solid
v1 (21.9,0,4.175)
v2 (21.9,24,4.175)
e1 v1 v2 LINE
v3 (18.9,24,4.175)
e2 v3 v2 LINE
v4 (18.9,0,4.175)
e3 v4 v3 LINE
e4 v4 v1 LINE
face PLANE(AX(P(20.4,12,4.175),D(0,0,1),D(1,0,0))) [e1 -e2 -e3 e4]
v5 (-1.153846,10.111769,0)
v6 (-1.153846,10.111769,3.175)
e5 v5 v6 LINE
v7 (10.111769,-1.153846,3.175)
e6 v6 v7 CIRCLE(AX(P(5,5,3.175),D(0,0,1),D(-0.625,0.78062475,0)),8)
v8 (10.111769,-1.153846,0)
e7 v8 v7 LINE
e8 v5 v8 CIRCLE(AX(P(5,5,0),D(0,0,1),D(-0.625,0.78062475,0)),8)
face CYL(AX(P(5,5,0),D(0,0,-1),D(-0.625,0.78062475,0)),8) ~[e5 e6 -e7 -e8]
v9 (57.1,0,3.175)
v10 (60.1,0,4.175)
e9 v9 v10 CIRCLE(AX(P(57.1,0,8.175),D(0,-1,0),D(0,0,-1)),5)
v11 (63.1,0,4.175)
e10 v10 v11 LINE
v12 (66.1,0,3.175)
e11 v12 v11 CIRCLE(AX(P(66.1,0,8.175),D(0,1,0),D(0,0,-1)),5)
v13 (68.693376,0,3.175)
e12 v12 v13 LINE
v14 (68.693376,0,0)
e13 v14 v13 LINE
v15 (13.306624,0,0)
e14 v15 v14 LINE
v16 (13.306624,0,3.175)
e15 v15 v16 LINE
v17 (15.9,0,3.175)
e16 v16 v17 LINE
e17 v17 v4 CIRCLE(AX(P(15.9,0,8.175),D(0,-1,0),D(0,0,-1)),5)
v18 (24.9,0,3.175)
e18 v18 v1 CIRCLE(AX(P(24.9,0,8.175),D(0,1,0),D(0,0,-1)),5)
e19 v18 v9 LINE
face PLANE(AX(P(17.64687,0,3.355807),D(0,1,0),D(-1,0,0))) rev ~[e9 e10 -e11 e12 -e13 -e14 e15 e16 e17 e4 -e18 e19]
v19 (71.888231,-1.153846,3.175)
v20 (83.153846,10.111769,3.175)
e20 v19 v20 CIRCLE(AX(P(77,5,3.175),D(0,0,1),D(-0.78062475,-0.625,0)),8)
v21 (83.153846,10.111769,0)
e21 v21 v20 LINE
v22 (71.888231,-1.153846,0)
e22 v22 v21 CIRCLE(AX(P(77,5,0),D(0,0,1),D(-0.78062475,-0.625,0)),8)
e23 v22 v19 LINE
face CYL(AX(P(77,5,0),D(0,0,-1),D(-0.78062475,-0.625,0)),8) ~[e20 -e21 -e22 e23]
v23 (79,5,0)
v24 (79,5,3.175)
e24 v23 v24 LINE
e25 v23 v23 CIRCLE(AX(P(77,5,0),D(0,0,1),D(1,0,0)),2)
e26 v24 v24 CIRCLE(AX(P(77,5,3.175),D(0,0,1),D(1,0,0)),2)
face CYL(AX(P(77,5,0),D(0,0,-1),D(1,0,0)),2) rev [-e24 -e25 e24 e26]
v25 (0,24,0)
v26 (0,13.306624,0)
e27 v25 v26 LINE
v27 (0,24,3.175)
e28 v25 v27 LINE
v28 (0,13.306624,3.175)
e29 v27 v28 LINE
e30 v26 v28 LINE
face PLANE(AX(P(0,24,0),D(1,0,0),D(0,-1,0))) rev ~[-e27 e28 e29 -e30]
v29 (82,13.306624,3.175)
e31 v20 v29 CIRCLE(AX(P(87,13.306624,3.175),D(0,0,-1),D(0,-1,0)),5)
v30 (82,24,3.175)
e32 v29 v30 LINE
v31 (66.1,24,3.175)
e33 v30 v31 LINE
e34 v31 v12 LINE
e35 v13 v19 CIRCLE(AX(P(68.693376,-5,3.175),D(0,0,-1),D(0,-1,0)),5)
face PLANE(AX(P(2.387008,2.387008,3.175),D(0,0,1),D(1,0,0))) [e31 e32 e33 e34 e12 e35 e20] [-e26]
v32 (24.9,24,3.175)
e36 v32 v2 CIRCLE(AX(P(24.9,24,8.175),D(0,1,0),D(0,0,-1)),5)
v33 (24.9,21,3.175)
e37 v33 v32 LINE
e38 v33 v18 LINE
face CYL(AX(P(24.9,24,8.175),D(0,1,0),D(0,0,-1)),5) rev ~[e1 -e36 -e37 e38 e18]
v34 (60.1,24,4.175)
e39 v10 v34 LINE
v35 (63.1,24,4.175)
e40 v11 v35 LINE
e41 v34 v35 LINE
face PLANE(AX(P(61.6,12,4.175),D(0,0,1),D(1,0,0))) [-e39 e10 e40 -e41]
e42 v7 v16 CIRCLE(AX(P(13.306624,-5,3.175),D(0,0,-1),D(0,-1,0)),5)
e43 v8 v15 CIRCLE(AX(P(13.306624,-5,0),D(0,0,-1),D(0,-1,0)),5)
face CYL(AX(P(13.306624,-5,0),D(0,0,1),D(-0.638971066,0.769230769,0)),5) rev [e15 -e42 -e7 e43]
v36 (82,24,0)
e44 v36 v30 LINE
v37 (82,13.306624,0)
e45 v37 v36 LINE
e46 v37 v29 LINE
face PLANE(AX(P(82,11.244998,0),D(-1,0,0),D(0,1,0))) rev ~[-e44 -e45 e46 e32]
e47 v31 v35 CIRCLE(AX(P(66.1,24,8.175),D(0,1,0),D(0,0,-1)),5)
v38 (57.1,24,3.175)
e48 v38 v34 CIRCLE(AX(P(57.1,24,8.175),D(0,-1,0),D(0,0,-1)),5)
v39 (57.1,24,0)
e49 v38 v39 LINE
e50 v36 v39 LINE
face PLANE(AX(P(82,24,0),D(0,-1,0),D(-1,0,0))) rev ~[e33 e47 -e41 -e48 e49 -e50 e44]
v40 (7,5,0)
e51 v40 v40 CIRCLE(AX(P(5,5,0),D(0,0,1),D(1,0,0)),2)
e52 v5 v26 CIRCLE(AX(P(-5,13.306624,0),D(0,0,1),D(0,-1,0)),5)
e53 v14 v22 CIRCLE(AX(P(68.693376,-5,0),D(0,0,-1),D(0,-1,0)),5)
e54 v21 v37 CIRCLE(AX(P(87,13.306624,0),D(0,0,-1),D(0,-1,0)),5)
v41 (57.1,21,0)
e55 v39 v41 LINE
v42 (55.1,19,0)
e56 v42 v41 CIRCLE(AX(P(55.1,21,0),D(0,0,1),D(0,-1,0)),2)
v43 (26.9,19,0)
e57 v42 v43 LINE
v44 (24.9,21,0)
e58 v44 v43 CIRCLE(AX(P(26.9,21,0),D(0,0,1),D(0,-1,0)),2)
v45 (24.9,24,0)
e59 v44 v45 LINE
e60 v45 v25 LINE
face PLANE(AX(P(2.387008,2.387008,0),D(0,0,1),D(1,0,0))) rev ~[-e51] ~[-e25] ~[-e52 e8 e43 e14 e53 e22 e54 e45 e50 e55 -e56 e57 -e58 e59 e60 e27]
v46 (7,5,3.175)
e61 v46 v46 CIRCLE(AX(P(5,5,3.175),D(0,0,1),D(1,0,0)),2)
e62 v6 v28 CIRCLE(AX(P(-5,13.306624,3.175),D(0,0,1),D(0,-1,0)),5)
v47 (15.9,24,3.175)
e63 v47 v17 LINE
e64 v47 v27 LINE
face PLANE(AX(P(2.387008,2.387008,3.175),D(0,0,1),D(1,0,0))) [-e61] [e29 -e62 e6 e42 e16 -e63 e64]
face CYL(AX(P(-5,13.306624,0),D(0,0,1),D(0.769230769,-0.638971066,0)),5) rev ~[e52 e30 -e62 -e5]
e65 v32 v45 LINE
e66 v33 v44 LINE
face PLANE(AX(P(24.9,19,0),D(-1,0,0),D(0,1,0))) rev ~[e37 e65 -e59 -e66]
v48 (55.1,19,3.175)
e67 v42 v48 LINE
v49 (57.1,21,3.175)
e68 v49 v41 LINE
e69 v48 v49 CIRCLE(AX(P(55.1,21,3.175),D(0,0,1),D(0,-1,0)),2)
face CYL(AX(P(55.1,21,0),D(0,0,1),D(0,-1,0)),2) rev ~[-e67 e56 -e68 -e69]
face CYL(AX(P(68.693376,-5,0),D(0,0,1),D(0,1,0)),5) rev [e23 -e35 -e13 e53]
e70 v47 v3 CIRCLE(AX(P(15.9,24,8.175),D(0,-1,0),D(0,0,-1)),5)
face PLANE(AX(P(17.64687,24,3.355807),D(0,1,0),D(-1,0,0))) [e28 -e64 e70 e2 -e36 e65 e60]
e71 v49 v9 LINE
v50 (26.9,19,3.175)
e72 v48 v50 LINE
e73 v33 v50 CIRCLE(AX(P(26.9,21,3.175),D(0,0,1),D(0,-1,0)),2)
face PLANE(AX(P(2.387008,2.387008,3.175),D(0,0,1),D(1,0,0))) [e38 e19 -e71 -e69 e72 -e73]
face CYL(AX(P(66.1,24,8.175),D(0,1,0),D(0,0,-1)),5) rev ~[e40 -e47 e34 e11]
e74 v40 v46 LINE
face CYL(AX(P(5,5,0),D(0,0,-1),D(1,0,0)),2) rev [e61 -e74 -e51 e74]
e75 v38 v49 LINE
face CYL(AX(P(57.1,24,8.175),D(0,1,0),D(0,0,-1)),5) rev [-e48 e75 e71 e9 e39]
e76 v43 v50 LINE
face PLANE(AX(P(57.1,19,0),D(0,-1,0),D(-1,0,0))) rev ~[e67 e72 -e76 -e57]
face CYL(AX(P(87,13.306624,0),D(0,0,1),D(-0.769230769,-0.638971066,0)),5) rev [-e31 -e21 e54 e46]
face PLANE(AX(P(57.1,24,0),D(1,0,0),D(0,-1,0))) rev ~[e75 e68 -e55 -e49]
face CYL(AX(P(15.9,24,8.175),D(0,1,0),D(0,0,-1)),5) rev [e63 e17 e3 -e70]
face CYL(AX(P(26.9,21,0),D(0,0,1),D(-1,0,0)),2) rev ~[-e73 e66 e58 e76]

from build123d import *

# Parameters (mm, degrees)
F0_R        = 2
F1_DEPTH    = 3.175
F2_R        = 5
F3_R        = 2
F4_W        = 3
F4_H        = 24
F5_DEPTH    = 1
F6_T1_DEPTH = 24


# Not quite as in the source:
# - a fillet or chamfer that OpenCascade refuses, or shapes differently, is made with other operations: its cross-section is extruded or revolved along the edge and cut away or added


with BuildPart() as f1:
    # F0 (on Top) → F1 (new body)
    with BuildSketch(Plane.XY):
        with BuildLine():
            Line((11.2449979984, 0), (0, 0))
            Line((0, 0), (0, 11.2449979984))
            ThreePointArc((0, 11.2449979984), (-0.6568542495, -0.6568542495), (11.2449979984, 0))
        make_face()
        Polygon((0, 11.2449979984), (0, 0), (11.2449979984, 0), (41, 0), (70.7550020016, 0), (82, 0), (82, 11.2449979984), (82, 24), (57.1, 24), (57.1, 19), (41, 19), (24.9, 19), (24.9, 24), (0, 24), align=None)
        with Locations((5, 5)):
            Circle(F0_R, mode=Mode.SUBTRACT)
        with Locations((77, 5)):
            Circle(F0_R, mode=Mode.SUBTRACT)
        with BuildLine():
            Line((82, 0), (70.7550020016, 0))
            ThreePointArc((70.7550020016, 0), (82.6568542495, -0.6568542495), (82, 11.2449979984))
            Line((82, 11.2449979984), (82, 0))
        make_face()
    extrude(amount=F1_DEPTH)

    # F2
    f2_edges = [f1.edges().sort_by_distance(p)[0] for p in [
        (11.244998, 0, 1.5875),
        (70.755002, 0, 1.5875),
        (82, 11.244998, 1.5875),
        (0, 11.244998, 1.5875),
    ]]
    fillet(f2_edges, radius=F2_R)

    # F3
    f3_edges = [f1.edges().sort_by_distance(p)[0] for p in [
        (24.9, 19, 1.5875),
        (57.1, 19, 1.5875),
    ]]
    fillet(f3_edges, radius=F3_R)

    # F4 (on face) → F5 (join)
    with BuildSketch(Plane.XY.offset(3.175)):
        with Locations((20.4, 12)):
            Rectangle(F4_W, F4_H)
        with Locations((61.6, 12)):
            Rectangle(F4_W, F4_H)
    extrude(amount=F5_DEPTH)

    # F6: fillet of radius 5 on 4 edges, made by hand

    # F6_s2 → F6_t1 (join)
    with BuildSketch(Plane.XZ.offset(-24)):
        with BuildLine():
            ThreePointArc((15.9, 3.175), (17.4811388301, 3.4315835097), (18.9, 4.175))
            Line((18.9, 4.175), (18.96, 4.095))
            ThreePointArc((18.96, 4.095), (19, 3.675), (19, 3.175))
            Line((19, 3.175), (18.9, 3.075))
            Line((18.9, 3.075), (15.9, 3.075))
            Line((15.9, 3.075), (15.9, 3.175))
        make_face()
        with BuildLine():
            ThreePointArc((24.9, 3.175), (23.3188611699, 3.4315835097), (21.9, 4.175))
            Line((21.9, 4.175), (21.84, 4.095))
            ThreePointArc((21.84, 4.095), (21.8, 3.675), (21.8, 3.175))
            Line((21.8, 3.175), (21.9, 3.075))
            Line((21.9, 3.075), (24.9, 3.075))
            Line((24.9, 3.075), (24.9, 3.175))
        make_face()
        with BuildLine():
            ThreePointArc((57.1, 3.175), (58.6811388301, 3.4315835097), (60.1, 4.175))
            Line((60.1, 4.175), (60.16, 4.095))
            ThreePointArc((60.16, 4.095), (60.2, 3.675), (60.2, 3.175))
            Line((60.2, 3.175), (60.1, 3.075))
            Line((60.1, 3.075), (57.1, 3.075))
            Line((57.1, 3.075), (57.1, 3.175))
        make_face()
        with BuildLine():
            ThreePointArc((66.1, 3.175), (64.5188611699, 3.4315835097), (63.1, 4.175))
            Line((63.1, 4.175), (63.04, 4.095))
            ThreePointArc((63.04, 4.095), (63, 3.675), (63, 3.175))
            Line((63, 3.175), (63.1, 3.075))
            Line((63.1, 3.075), (66.1, 3.075))
            Line((66.1, 3.075), (66.1, 3.175))
        make_face()
    extrude(amount=F6_T1_DEPTH)


solid = f1.part
